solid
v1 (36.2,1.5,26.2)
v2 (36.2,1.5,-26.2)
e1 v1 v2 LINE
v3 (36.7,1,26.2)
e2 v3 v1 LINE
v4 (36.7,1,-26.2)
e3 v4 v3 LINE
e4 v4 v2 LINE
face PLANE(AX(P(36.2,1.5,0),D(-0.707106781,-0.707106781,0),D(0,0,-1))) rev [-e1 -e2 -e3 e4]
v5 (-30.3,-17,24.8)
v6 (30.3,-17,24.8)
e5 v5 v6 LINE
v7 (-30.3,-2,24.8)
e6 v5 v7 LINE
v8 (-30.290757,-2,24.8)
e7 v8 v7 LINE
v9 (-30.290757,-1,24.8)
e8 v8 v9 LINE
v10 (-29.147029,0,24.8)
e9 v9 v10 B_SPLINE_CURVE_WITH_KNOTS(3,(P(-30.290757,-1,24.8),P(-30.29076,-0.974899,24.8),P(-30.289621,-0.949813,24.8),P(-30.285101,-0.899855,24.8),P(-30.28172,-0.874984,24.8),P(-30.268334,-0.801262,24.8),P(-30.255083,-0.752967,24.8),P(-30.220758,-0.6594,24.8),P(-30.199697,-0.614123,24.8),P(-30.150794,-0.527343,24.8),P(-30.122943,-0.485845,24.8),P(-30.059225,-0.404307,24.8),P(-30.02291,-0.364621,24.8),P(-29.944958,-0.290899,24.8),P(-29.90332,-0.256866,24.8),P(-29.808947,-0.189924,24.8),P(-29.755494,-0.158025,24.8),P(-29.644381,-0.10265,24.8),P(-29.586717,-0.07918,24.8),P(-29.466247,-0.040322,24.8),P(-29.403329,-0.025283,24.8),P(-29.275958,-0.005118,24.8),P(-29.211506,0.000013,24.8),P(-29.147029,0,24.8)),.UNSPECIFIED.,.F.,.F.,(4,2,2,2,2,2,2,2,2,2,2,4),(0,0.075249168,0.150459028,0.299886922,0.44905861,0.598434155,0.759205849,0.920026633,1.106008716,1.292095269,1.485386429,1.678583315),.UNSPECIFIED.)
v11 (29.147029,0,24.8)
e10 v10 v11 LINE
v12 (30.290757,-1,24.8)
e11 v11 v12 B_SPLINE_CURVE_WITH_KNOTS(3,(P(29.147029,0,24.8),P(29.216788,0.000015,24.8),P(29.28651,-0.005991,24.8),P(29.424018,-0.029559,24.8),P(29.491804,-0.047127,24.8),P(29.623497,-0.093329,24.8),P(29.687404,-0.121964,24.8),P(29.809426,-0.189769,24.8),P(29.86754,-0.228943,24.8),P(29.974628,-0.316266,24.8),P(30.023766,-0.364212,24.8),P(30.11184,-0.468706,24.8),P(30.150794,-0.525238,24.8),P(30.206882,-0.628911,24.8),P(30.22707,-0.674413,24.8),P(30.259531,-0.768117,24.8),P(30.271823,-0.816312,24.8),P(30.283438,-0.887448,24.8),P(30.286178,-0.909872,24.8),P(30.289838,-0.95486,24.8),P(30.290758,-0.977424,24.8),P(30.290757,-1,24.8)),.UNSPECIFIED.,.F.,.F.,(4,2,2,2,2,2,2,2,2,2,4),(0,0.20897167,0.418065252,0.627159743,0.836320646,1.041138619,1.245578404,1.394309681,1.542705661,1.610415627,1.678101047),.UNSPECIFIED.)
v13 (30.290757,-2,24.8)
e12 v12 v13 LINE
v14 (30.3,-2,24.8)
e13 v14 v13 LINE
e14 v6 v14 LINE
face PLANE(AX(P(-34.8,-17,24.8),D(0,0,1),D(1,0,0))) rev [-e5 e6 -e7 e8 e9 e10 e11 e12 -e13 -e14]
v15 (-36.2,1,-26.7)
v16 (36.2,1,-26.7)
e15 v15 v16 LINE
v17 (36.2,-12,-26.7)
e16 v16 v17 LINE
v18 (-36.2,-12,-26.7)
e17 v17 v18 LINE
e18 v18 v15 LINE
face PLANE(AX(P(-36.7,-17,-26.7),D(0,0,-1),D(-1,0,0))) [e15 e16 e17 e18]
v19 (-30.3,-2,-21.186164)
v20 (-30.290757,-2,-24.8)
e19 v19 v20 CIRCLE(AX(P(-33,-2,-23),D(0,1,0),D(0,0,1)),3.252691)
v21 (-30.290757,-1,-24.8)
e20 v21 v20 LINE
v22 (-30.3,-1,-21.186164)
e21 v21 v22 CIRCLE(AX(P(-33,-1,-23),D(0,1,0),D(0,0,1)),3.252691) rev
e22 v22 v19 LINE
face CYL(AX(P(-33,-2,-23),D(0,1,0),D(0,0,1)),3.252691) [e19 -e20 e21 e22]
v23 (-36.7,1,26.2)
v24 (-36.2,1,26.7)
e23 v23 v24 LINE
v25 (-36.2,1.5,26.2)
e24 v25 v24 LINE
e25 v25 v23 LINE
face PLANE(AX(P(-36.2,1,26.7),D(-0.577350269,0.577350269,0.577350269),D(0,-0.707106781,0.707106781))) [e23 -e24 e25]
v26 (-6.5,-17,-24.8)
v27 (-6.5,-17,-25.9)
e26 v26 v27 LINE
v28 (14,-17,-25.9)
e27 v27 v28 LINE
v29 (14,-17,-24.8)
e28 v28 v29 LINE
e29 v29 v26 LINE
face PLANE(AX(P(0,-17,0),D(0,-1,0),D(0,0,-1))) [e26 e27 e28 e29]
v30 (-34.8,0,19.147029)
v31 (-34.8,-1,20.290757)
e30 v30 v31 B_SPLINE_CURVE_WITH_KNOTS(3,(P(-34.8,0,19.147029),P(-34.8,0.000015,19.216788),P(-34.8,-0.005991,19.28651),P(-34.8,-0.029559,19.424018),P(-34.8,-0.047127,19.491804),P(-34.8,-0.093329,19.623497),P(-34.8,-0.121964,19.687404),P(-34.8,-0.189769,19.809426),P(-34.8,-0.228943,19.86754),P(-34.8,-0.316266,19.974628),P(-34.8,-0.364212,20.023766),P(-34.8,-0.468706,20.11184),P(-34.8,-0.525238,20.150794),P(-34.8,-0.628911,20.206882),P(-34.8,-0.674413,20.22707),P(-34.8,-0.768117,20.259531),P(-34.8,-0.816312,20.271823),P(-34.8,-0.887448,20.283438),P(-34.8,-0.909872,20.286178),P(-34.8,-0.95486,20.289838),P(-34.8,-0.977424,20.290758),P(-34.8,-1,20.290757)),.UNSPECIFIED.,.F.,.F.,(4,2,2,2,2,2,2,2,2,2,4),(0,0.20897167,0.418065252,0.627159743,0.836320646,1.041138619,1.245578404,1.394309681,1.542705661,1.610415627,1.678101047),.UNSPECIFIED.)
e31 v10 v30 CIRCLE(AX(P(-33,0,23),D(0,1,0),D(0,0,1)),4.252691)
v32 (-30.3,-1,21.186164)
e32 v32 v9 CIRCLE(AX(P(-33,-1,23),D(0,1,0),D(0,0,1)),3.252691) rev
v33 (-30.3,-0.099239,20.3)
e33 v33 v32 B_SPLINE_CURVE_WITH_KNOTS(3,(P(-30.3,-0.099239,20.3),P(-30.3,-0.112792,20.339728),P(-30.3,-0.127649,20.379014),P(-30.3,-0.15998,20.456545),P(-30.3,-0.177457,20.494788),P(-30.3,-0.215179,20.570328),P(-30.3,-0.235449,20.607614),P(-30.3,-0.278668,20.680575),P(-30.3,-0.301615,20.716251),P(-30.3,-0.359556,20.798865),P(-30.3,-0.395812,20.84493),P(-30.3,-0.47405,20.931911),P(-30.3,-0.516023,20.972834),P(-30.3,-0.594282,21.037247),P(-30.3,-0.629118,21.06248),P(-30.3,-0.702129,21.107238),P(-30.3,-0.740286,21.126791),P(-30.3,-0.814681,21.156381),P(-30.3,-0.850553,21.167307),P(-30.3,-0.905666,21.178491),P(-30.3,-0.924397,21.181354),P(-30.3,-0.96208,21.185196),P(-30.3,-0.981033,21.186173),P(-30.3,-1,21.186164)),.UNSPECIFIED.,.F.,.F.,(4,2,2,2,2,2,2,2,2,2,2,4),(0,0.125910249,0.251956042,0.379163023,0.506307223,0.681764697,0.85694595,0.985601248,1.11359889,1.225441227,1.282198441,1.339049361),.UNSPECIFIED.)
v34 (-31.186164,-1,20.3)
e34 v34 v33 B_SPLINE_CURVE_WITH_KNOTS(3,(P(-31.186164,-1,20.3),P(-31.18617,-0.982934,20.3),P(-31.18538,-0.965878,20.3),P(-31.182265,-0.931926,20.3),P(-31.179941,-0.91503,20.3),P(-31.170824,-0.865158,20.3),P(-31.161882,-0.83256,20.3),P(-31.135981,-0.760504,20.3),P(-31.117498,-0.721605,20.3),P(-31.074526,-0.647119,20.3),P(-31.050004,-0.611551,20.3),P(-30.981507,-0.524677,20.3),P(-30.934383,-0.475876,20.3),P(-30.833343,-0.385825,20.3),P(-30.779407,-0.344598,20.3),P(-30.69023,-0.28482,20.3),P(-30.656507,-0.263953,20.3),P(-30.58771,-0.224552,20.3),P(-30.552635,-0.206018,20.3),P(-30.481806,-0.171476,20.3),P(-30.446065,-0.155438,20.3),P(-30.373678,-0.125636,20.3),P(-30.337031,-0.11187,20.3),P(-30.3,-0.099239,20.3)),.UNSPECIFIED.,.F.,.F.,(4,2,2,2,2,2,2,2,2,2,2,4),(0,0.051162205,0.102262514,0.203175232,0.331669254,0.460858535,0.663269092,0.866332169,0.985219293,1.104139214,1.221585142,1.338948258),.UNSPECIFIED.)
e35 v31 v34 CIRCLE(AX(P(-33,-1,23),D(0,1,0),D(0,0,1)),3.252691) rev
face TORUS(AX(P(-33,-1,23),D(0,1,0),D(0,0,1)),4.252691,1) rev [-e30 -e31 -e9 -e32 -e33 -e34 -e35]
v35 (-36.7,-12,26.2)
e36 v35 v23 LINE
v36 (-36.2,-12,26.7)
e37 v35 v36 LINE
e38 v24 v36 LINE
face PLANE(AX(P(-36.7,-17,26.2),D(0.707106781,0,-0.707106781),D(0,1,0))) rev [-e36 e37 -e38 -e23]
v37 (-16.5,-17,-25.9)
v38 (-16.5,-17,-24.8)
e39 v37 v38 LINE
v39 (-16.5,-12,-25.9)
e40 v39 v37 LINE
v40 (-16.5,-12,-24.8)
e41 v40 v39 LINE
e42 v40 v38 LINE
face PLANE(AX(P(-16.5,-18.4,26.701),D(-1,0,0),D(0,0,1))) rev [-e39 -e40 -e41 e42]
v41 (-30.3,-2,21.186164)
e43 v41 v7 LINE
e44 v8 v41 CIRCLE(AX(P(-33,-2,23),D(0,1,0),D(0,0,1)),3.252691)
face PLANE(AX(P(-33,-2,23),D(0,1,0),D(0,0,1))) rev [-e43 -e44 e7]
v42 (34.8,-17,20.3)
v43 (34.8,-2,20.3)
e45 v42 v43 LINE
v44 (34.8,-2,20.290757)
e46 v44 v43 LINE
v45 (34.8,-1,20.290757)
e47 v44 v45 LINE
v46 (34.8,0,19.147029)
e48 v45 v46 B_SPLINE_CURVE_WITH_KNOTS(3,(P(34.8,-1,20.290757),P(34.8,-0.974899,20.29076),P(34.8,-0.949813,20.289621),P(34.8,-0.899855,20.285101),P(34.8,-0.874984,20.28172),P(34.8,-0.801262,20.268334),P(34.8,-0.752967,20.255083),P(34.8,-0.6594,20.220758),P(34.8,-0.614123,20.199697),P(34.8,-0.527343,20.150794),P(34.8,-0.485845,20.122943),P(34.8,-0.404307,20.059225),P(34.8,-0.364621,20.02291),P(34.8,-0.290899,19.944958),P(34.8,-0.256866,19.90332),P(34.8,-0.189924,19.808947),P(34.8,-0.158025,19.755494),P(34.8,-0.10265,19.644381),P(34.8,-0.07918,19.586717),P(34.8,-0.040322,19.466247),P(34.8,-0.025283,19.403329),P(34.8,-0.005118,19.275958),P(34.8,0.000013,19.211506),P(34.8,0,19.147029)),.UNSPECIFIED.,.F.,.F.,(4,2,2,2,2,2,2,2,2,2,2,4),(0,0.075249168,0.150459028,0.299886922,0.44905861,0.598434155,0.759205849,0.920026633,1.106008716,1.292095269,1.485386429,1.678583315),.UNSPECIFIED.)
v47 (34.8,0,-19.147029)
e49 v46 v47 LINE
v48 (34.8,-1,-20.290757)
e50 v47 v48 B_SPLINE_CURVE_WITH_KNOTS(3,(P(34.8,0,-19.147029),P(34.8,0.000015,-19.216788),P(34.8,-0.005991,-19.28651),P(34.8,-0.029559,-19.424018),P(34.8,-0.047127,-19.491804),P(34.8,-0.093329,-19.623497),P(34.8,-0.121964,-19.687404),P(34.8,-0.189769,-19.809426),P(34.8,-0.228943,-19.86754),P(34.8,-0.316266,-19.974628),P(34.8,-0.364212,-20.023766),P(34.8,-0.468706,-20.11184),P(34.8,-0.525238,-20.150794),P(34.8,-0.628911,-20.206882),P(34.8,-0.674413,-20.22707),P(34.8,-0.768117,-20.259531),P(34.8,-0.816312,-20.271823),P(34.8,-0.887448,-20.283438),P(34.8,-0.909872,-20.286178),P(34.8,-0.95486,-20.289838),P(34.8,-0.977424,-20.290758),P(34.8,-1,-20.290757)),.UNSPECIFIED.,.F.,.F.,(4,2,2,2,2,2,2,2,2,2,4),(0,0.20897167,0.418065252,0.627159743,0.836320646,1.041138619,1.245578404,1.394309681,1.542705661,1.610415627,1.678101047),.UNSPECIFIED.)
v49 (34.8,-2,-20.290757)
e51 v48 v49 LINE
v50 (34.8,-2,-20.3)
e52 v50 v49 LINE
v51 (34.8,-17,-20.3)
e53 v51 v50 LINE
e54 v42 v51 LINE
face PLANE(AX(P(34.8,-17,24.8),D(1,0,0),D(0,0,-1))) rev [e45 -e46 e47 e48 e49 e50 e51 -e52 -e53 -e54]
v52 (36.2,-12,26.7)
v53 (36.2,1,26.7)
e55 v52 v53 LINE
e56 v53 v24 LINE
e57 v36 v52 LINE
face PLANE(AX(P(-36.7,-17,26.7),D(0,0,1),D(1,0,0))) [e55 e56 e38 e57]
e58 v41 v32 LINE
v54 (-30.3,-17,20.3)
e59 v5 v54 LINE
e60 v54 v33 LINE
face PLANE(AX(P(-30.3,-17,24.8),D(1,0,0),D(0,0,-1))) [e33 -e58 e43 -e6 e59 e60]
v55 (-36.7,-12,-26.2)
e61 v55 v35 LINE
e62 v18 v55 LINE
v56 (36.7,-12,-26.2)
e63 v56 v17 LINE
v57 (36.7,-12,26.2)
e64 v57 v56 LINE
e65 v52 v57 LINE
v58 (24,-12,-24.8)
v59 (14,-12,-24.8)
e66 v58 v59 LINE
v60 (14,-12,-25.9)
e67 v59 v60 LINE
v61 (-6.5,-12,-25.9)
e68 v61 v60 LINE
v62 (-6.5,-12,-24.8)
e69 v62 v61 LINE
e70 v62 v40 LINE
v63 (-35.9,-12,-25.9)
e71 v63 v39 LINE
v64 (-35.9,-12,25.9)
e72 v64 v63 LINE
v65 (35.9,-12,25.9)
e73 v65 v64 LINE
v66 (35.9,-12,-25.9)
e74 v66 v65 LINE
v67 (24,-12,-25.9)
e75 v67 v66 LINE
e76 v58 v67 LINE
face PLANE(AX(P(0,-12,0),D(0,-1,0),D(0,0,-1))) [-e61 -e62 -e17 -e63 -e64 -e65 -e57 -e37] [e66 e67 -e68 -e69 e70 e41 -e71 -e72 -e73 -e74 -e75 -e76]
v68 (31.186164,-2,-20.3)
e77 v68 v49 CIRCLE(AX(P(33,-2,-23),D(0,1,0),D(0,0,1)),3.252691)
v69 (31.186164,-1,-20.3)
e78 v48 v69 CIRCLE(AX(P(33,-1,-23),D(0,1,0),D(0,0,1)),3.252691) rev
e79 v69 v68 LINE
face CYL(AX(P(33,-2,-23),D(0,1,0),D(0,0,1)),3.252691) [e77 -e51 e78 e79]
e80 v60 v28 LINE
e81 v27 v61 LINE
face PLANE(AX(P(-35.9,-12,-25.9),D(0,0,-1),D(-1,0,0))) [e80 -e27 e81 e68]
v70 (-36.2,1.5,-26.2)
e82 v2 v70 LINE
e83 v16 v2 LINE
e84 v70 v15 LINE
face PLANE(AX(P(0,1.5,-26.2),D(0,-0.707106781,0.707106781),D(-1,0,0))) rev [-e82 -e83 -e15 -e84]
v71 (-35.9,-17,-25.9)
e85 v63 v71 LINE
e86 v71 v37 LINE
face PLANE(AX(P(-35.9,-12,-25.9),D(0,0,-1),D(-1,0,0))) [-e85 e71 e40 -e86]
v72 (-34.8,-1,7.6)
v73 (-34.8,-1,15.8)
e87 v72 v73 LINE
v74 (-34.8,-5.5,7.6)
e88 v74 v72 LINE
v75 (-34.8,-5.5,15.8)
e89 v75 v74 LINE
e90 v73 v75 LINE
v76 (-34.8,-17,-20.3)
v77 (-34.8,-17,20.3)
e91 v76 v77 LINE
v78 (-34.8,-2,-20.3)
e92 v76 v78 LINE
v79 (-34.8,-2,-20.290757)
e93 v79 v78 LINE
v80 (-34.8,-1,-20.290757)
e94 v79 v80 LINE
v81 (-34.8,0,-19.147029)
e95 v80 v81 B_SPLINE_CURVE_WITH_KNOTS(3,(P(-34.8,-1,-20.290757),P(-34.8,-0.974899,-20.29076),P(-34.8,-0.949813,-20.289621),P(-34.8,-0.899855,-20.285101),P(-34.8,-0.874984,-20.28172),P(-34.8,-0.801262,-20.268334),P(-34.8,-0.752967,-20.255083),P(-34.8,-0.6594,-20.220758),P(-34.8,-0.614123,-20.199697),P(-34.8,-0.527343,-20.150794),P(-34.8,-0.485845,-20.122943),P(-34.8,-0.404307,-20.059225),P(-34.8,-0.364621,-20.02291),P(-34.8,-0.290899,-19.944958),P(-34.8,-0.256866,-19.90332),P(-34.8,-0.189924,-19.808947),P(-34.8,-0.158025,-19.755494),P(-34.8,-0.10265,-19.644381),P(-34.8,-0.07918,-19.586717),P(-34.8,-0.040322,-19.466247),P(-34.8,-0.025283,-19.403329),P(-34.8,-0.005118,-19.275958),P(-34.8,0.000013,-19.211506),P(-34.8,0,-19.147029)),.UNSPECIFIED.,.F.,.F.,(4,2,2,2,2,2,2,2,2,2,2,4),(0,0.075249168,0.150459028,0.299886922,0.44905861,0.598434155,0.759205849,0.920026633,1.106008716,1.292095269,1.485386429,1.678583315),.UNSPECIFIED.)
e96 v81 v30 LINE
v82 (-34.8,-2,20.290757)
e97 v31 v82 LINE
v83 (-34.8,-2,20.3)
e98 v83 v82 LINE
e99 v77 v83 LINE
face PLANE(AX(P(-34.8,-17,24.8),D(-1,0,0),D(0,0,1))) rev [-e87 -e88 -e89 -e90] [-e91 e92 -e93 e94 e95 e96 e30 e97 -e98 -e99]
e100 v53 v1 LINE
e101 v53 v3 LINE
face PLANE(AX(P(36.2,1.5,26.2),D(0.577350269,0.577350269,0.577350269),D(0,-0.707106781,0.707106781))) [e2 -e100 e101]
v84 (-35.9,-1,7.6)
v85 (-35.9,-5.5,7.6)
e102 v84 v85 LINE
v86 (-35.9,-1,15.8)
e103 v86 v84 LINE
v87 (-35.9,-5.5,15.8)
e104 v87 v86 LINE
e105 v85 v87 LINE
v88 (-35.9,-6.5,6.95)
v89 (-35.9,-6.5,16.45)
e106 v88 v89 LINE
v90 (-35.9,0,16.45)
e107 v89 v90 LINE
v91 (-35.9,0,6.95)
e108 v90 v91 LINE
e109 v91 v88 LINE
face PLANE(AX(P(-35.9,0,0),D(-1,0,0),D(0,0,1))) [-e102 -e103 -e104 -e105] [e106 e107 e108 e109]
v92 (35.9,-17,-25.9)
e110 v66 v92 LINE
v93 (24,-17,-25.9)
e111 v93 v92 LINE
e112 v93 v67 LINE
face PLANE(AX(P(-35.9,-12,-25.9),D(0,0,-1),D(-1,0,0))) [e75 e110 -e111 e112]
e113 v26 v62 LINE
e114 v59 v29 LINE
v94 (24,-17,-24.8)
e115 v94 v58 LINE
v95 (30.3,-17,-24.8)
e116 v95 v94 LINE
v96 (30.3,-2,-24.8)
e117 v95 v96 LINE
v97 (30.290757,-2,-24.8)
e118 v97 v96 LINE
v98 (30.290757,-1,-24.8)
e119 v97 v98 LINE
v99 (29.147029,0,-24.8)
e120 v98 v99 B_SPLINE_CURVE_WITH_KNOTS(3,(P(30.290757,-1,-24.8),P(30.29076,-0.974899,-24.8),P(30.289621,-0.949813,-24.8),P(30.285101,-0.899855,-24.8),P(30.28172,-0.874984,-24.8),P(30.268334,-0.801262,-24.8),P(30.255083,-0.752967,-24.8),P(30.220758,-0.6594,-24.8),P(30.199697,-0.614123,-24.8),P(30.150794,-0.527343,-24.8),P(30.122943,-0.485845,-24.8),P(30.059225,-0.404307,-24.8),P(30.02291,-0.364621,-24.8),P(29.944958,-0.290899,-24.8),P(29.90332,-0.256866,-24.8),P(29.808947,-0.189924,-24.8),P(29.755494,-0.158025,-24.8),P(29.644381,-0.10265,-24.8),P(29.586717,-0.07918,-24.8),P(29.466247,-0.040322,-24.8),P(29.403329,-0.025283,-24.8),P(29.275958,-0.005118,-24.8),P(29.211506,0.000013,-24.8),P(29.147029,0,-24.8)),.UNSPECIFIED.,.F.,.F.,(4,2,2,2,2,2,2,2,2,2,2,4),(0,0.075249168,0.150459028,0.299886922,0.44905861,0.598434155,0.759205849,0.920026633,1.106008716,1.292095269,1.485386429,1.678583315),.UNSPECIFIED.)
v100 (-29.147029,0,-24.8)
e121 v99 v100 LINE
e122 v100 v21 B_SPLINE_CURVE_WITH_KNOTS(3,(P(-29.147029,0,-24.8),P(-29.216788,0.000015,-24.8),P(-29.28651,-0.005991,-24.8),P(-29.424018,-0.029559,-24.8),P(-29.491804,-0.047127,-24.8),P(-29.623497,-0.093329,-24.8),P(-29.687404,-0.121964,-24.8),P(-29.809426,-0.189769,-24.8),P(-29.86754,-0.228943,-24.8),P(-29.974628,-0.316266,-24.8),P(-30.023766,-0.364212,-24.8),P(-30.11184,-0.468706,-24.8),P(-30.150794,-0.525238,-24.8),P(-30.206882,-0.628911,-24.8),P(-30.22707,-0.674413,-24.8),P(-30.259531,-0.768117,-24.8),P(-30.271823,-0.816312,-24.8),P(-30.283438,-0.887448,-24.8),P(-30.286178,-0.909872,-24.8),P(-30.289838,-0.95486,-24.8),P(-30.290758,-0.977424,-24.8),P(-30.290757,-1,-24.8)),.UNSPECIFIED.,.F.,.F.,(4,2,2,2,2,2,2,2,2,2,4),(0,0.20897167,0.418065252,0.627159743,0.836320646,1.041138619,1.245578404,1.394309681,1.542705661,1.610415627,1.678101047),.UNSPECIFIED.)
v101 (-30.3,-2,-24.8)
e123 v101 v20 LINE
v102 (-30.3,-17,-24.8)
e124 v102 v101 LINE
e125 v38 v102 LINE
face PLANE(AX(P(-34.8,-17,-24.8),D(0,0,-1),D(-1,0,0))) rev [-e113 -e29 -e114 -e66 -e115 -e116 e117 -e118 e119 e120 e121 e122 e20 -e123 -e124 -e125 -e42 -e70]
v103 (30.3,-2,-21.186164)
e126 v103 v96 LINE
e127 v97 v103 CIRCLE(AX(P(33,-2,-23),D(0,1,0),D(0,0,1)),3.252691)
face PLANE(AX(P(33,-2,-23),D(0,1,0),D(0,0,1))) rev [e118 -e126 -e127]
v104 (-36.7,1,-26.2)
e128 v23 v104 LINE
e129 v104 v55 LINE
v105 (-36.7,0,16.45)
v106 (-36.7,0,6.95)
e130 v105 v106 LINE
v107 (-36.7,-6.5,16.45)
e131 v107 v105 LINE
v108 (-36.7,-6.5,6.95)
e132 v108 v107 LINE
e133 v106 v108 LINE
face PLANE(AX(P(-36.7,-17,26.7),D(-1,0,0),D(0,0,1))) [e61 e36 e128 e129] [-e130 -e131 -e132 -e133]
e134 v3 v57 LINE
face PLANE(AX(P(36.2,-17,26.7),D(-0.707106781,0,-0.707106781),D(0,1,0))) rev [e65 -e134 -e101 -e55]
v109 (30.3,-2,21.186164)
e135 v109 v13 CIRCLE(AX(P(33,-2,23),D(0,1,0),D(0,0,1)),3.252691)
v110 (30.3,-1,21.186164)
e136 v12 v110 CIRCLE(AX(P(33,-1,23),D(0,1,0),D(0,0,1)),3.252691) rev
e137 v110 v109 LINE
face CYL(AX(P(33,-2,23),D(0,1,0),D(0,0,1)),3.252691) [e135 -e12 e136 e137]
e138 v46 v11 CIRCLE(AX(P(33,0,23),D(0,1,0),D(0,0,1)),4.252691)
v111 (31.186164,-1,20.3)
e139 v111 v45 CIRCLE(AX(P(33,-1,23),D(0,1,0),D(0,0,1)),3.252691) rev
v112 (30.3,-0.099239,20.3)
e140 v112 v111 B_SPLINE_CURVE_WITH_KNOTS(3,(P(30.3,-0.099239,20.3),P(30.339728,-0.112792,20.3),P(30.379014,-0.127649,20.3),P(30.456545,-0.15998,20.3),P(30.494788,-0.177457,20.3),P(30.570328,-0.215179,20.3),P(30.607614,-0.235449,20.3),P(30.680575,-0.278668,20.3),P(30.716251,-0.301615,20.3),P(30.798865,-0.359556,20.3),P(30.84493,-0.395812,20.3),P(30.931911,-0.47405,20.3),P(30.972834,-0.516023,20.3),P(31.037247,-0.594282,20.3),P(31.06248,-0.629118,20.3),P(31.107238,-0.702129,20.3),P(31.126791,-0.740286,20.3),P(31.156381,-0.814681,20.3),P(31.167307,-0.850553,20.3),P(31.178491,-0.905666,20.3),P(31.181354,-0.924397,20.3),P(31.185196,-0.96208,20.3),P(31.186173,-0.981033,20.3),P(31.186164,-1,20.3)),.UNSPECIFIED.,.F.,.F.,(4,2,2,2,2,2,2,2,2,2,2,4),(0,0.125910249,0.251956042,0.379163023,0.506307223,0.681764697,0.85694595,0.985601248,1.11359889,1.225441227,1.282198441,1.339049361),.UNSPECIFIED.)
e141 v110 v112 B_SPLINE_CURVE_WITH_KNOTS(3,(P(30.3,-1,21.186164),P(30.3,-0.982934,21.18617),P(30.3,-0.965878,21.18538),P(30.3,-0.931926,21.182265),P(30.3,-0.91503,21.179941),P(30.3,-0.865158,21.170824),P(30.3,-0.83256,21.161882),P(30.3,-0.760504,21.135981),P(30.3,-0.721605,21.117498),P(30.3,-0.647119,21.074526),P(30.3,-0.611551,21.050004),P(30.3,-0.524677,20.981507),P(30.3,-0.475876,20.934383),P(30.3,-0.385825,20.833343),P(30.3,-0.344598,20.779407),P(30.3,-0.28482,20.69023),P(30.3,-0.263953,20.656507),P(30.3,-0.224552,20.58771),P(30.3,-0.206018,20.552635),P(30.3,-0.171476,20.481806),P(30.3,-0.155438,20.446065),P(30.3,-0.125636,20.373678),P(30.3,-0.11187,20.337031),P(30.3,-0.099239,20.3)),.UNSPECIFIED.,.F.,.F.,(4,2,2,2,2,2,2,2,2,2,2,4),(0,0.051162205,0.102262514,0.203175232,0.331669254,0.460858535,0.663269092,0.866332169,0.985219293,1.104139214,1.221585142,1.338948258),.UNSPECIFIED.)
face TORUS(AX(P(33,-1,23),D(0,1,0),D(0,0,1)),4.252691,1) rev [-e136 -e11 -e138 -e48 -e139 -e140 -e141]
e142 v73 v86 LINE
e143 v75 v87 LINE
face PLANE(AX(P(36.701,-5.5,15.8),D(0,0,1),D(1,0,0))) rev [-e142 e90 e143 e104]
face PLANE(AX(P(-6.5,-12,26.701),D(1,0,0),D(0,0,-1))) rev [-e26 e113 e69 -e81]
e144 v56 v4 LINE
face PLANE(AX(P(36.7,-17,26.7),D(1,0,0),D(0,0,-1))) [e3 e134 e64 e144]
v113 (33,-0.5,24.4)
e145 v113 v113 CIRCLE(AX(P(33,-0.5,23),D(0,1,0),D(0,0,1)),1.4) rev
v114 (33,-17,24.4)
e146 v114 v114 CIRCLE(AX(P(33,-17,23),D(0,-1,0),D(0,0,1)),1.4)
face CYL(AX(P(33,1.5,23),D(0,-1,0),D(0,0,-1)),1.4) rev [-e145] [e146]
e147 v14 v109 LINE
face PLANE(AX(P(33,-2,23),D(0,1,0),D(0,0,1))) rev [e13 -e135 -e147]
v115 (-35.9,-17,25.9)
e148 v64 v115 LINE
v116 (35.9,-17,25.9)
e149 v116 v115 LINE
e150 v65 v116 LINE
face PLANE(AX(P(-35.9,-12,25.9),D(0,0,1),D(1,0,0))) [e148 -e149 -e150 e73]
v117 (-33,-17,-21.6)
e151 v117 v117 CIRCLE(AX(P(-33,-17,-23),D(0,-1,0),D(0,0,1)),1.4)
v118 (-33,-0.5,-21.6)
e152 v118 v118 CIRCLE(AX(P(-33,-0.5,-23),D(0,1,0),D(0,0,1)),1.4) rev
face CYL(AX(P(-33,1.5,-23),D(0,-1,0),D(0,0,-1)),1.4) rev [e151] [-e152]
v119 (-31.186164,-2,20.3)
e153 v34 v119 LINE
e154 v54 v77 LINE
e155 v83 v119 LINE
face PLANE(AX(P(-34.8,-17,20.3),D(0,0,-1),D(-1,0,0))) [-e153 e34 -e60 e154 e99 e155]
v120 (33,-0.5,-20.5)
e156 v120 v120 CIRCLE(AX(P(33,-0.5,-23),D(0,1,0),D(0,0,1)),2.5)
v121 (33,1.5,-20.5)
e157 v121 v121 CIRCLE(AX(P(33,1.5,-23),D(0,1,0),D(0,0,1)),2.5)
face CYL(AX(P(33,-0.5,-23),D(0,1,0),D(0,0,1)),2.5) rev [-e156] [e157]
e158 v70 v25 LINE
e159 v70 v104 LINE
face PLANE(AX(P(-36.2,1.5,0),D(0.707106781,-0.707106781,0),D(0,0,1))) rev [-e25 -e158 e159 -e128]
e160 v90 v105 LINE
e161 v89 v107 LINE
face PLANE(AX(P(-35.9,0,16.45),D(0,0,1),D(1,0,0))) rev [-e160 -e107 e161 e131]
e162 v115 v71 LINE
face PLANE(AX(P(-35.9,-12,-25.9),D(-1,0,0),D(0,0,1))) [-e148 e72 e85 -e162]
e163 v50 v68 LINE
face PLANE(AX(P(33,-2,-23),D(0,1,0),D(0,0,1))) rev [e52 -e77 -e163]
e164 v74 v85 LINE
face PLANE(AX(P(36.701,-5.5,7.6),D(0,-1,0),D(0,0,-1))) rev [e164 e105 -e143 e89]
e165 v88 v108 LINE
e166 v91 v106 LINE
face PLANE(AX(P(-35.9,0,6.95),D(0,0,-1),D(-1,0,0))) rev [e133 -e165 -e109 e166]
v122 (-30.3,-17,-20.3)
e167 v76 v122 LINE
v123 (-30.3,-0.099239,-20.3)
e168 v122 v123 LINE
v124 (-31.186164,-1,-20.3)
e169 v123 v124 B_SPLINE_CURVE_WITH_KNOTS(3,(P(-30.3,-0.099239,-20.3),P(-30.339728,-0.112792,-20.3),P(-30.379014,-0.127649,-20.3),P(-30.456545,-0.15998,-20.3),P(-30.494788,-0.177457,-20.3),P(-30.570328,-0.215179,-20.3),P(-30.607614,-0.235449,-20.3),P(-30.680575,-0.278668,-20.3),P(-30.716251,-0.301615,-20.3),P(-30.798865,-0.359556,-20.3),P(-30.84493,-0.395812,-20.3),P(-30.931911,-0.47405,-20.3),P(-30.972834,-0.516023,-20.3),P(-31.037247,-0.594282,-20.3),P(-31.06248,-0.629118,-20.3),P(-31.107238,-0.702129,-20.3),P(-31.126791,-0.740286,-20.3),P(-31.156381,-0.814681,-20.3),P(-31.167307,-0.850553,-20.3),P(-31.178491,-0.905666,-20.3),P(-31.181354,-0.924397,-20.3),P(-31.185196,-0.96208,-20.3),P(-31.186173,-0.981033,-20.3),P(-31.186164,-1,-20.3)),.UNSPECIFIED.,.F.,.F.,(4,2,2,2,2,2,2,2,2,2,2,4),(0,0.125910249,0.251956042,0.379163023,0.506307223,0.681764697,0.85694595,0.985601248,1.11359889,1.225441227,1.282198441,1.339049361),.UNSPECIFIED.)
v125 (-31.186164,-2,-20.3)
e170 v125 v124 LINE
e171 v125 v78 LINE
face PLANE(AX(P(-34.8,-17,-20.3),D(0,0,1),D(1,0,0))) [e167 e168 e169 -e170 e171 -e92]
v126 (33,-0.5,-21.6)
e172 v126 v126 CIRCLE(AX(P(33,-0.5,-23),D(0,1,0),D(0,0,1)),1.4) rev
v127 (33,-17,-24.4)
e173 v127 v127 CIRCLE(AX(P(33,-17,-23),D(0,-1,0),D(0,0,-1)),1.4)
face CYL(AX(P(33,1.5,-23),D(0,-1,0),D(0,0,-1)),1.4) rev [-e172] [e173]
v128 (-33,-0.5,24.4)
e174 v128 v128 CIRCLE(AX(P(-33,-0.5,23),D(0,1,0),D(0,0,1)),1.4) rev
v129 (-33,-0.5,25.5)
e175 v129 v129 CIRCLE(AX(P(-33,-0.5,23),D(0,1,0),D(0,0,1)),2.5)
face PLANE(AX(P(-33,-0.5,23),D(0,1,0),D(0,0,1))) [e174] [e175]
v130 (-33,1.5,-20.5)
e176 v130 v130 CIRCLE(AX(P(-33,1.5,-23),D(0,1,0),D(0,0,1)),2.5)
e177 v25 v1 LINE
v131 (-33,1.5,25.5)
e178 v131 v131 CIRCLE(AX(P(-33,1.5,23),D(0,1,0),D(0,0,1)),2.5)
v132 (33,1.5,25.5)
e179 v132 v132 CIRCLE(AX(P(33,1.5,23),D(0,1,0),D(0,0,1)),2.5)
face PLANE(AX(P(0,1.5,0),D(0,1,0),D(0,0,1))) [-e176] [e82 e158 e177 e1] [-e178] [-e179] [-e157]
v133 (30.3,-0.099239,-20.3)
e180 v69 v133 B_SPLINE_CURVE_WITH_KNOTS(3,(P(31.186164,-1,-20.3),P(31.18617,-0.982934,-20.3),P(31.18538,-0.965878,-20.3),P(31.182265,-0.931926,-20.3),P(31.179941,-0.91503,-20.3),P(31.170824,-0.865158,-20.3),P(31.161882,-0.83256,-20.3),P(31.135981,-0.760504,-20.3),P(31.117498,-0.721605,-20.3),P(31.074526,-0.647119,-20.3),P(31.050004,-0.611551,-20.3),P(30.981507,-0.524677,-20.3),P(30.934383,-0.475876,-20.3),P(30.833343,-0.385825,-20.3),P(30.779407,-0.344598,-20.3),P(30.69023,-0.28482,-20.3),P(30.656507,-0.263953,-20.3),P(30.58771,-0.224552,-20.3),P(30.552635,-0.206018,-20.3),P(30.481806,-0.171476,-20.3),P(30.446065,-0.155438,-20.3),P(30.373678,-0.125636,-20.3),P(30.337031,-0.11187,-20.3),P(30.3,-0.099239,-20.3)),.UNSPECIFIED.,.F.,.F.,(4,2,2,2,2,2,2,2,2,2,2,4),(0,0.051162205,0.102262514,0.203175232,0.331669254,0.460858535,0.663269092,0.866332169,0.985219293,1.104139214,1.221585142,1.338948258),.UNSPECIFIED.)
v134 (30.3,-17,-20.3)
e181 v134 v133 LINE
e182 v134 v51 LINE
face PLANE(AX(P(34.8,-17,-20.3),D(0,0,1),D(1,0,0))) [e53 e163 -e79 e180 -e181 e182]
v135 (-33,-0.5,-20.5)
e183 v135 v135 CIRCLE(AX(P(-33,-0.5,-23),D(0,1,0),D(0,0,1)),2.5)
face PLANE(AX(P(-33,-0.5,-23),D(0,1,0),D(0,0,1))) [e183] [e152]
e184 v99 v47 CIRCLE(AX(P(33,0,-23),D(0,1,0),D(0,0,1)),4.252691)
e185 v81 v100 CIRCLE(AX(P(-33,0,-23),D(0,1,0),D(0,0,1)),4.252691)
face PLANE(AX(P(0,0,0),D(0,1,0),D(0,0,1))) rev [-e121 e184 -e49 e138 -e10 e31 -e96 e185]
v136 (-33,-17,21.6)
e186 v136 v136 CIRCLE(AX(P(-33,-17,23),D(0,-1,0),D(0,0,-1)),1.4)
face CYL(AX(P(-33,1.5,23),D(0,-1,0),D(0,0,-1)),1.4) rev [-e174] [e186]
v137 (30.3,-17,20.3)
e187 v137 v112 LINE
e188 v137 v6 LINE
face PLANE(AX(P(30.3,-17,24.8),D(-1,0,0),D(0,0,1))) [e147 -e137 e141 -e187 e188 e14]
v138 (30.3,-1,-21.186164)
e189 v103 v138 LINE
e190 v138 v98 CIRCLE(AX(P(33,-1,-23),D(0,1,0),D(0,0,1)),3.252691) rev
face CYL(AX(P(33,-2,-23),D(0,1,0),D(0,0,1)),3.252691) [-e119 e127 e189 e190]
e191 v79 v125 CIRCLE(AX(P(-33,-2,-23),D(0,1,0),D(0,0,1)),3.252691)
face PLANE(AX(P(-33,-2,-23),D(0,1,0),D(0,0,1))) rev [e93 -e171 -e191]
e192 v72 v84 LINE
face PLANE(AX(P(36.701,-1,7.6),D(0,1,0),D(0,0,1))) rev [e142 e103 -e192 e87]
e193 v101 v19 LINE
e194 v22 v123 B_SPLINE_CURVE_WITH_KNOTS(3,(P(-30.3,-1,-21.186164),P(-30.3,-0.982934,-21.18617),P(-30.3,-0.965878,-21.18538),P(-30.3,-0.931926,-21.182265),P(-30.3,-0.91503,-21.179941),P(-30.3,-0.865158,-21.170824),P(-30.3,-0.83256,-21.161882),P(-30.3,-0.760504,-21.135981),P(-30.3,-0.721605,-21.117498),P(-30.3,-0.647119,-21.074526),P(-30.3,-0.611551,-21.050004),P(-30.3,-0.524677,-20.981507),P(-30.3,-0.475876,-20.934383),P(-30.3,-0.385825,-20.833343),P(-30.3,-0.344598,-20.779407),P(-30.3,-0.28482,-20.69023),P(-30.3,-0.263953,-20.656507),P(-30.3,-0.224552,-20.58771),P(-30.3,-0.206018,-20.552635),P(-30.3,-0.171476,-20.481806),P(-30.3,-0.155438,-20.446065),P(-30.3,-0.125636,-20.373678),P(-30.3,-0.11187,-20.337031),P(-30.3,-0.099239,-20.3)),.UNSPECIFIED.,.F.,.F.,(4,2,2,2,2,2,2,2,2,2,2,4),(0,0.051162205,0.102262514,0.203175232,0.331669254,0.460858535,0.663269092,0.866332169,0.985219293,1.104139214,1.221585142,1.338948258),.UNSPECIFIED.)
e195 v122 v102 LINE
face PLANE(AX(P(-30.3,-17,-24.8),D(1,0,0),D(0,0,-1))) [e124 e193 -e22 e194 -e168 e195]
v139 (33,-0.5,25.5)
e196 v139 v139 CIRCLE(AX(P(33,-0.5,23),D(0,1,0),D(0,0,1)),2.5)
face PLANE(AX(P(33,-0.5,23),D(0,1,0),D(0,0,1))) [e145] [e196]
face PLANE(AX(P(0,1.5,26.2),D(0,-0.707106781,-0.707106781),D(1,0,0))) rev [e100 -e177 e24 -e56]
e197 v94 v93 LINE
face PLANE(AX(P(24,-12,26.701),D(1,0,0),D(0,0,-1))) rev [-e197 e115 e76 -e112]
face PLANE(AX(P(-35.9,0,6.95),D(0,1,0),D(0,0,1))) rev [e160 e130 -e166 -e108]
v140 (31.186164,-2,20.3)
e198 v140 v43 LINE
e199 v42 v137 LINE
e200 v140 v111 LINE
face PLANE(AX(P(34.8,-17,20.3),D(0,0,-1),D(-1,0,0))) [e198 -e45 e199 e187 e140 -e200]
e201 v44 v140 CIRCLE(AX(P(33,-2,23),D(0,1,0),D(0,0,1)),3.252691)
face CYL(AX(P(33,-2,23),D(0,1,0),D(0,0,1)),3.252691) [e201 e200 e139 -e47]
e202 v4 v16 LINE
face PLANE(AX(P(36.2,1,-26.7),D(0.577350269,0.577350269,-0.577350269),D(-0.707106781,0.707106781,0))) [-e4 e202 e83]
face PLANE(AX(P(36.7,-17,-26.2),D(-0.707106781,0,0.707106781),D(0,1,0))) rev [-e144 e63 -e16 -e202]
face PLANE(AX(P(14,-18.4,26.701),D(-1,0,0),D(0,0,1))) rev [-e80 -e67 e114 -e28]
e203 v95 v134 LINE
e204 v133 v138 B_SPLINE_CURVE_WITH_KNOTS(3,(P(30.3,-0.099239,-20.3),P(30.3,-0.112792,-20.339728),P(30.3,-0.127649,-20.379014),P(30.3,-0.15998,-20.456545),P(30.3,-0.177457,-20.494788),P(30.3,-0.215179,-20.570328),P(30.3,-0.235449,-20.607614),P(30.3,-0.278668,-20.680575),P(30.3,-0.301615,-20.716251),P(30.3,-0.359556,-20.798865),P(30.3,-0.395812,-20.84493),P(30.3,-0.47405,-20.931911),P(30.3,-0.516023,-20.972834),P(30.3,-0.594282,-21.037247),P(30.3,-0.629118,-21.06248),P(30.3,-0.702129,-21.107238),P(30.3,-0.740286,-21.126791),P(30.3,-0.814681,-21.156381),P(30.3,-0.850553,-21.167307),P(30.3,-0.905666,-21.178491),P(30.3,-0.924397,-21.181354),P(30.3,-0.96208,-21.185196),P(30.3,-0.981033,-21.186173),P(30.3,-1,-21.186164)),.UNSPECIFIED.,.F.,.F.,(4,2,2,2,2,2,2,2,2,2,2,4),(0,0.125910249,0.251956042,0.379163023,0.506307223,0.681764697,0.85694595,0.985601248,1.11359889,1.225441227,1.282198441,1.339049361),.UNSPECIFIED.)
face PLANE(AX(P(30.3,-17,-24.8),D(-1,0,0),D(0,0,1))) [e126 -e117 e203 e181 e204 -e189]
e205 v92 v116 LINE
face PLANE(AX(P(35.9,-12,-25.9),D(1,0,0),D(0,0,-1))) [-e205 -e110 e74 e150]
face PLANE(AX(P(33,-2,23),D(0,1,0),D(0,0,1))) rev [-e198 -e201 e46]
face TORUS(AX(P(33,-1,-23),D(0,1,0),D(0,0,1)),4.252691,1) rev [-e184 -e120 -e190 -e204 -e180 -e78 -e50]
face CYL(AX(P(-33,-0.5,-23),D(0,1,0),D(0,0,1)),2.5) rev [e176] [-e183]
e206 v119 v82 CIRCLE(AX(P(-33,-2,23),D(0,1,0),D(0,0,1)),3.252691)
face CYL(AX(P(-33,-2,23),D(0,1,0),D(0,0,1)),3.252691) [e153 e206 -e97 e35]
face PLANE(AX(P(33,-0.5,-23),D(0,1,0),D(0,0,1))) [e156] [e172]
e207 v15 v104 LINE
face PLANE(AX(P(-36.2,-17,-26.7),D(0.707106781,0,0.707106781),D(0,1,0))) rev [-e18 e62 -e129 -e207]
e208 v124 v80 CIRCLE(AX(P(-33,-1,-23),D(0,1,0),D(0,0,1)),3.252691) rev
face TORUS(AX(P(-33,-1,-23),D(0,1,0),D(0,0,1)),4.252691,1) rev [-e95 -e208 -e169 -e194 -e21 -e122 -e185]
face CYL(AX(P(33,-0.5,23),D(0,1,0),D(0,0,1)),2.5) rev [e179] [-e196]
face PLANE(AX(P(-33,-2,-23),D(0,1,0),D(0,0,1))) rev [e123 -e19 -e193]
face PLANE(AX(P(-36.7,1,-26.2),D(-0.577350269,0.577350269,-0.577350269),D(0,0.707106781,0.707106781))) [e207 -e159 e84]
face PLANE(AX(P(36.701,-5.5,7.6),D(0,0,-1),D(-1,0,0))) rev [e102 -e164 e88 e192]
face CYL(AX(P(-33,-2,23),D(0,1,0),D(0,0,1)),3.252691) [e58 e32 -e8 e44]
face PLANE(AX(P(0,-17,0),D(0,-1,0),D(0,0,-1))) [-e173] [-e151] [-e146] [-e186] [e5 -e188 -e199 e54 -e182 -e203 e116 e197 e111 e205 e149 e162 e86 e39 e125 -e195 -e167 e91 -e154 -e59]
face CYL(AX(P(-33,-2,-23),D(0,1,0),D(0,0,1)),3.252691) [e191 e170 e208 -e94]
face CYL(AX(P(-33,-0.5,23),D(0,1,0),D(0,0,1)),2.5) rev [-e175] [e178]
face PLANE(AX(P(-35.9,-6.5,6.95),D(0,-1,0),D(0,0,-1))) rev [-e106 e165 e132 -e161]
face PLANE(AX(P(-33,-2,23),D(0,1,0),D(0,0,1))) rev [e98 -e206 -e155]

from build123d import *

# Parameters (mm, degrees)
SKETCH_1_W           = 73.4
SKETCH_1_H           = 53.4
SKETCH_1_W_2         = 69.6
SKETCH_1_H_2         = 49.6
EXTRUDE_1_DEPTH      = 17
SKETCH_2_W           = 73.4
SKETCH_2_H           = 53.4
EXTRUDE_2_DEPTH      = 1.5
SKETCH_3_W           = 4.5
SKETCH_3_H           = 4.5
EXTRUDE_3_DEPTH      = 17
SKETCH_9_R           = 3.252691193
EXTRUDE_5_DEPTH      = 2
CHAMFER_1_SIZE       = 0.5
SKETCH_6_OUTSIDE_W   = 93.928
SKETCH_6_OUTSIDE_H   = 73.928
SKETCH_6_OUTSIDE_W_2 = 71.8
SKETCH_6_OUTSIDE_H_2 = 51.8
CUT_EXTRUDE_3_DEPTH  = 5
SKETCH_5_R           = 1.4
CUT_EXTRUDE_2_DEPTH  = 50.010509077
CUT_EXTRUDE_4_REACH  = 68.988
SKETCH_7_W           = 10
SKETCH_7_H           = 6.4
SKETCH_8_R           = 2.5
CUT_EXTRUDE_5_DEPTH  = 2
SKETCH_10_W          = 9.5
SKETCH_10_H          = 6.5
CUT_EXTRUDE_6_DEPTH  = 0.8
CUT_EXTRUDE_7_REACH  = 81.2
SKETCH_11_W          = 8.2
SKETCH_11_H          = 4.5
FILLET_1_R           = 1


with BuildPart() as part:
    # Эскиз1 → Бобышка-Вытянуть1 (new body)
    with BuildSketch(Plane(origin=(0, 0, 0), x_dir=(1, 0, 0), z_dir=(0, 1, 0))):
        Rectangle(SKETCH_1_W, SKETCH_1_H)
        Rectangle(SKETCH_1_W_2, SKETCH_1_H_2, mode=Mode.SUBTRACT)
    extrude(amount=-EXTRUDE_1_DEPTH)

    # Эскиз2 → Бобышка-Вытянуть2 (add)
    with BuildSketch(Plane(origin=(0, 0, 0), x_dir=(1, 0, 0), z_dir=(0, 1, 0))):
        Rectangle(SKETCH_2_W, SKETCH_2_H)
    extrude(amount=EXTRUDE_2_DEPTH)

    # Эскиз3 → Бобышка-Вытянуть3 (add, through all)
    with BuildSketch(Plane(origin=(0, 0, 0), x_dir=(1, 0, 0), z_dir=(0, 1, 0))):
        with Locations((-32.55, 22.55)):
            Rectangle(SKETCH_3_W, SKETCH_3_H)
        with Locations((32.55, 22.55)):
            Rectangle(SKETCH_3_W, SKETCH_3_H)
        with Locations((-32.55, -22.55)):
            Rectangle(SKETCH_3_W, SKETCH_3_H)
        with Locations((32.55, -22.55)):
            Rectangle(SKETCH_3_W, SKETCH_3_H)
    extrude(amount=-EXTRUDE_3_DEPTH)

    # Эскиз9 → Бобышка-Вытянуть5 (add)
    with BuildSketch(Plane(origin=(0, 0, 0), x_dir=(-1, 0, 0), z_dir=(0, 1, 0))):
        with Locations((-33, 23)):
            Circle(SKETCH_9_R)
        with Locations((-33, -23)):
            Circle(SKETCH_9_R)
        with Locations((33, -23)):
            Circle(SKETCH_9_R)
        with Locations((33, 23)):
            Circle(SKETCH_9_R)
    extrude(amount=-EXTRUDE_5_DEPTH)

    # Фаска1
    chamfer_1_edges = [part.edges().sort_by_distance(p)[0] for p in [
        (-36.7, 1.5, 0),
        (0, 1.5, 26.7),
        (36.7, 1.5, 0),
        (0, 1.5, -26.7),
        (-36.7, -7.75, -26.7),
        (36.7, -7.75, -26.7),
        (36.7, -7.75, 26.7),
        (-36.7, -7.75, 26.7),
    ]]
    chamfer(chamfer_1_edges, length=CHAMFER_1_SIZE)

    # Эскиз6 outside → Вырез-Вытянуть3 (cut)
    with BuildSketch(Plane.XZ.offset(17)):
        Rectangle(SKETCH_6_OUTSIDE_W, SKETCH_6_OUTSIDE_H)
        Rectangle(SKETCH_6_OUTSIDE_W_2, SKETCH_6_OUTSIDE_H_2, mode=Mode.SUBTRACT)
    extrude(amount=-CUT_EXTRUDE_3_DEPTH, mode=Mode.SUBTRACT)

    # Эскиз5 → Вырез-Вытянуть2 (cut, through all)
    with BuildSketch(Plane.XZ.offset(17)):
        with Locations(Location((-33, 23, 0), (0, 0, 270))):
            Circle(SKETCH_5_R)
        with Locations(Location((33, 23, 0), (0, 0, 90))):
            Circle(SKETCH_5_R)
        with Locations(Location((33, -23, 0), (0, 0, 270))):
            Circle(SKETCH_5_R)
        with Locations(Location((-33, -23, 0), (0, 0, 90))):
            Circle(SKETCH_5_R)
    extrude(amount=-CUT_EXTRUDE_2_DEPTH, mode=Mode.SUBTRACT)

    # Эскиз7 → Вырез-Вытянуть4 (cut, up to next)
    with BuildSketch(Plane(origin=(0, 0, -26.7), x_dir=(-1, 0, 0), z_dir=(0, 0, -1)), mode=Mode.PRIVATE) as cut_extrude_4_sk1:
        with Locations((-19, -15.2)):
            Rectangle(SKETCH_7_W, SKETCH_7_H)
    cut_extrude_4_tool1 = extrude(cut_extrude_4_sk1.sketch, amount=-CUT_EXTRUDE_4_REACH, mode=Mode.PRIVATE) & part.part
    # Эскиз7 → Вырез-Вытянуть4 (cut, up to next)
    with BuildSketch(Plane(origin=(0, 0, -26.7), x_dir=(-1, 0, 0), z_dir=(0, 0, -1)), mode=Mode.PRIVATE) as cut_extrude_4_sk2:
        with Locations((11.5, -15.2)):
            Rectangle(SKETCH_7_W, SKETCH_7_H)
    cut_extrude_4_tool2 = extrude(cut_extrude_4_sk2.sketch, amount=-CUT_EXTRUDE_4_REACH, mode=Mode.PRIVATE) & part.part
    add(cut_extrude_4_tool1.solids().sort_by_distance((19, -15.2, -26.7))[0], mode=Mode.SUBTRACT)
    add(cut_extrude_4_tool2.solids().sort_by_distance((-11.5, -15.2, -26.7))[0], mode=Mode.SUBTRACT)

    # Эскиз8 → Вырез-Вытянуть5 (cut)
    with BuildSketch(Plane(origin=(0, 1.5, 0), x_dir=(1, 0, 0), z_dir=(0, 1, 0))):
        with Locations(Location((-33, 23, 0), (0, 0, 270))):
            Circle(SKETCH_8_R)
        with Locations(Location((33, 23, 0), (0, 0, 270))):
            Circle(SKETCH_8_R)
        with Locations(Location((33, -23, 0), (0, 0, 270))):
            Circle(SKETCH_8_R)
        with Locations(Location((-33, -23, 0), (0, 0, 270))):
            Circle(SKETCH_8_R)
    extrude(amount=-CUT_EXTRUDE_5_DEPTH, mode=Mode.SUBTRACT)

    # Эскиз10 → Вырез-Вытянуть6 (cut)
    with BuildSketch(Plane.ZY.offset(36.7)):
        with Locations((11.7, -3.25)):
            Rectangle(SKETCH_10_W, SKETCH_10_H)
    extrude(amount=-CUT_EXTRUDE_6_DEPTH, mode=Mode.SUBTRACT)

    # Эскиз11 → Вырез-Вытянуть7 (cut, up to next)
    with BuildSketch(Plane.ZY.offset(35.9), mode=Mode.PRIVATE) as cut_extrude_7_sk1:
        with Locations((11.7, -3.25)):
            Rectangle(SKETCH_11_W, SKETCH_11_H)
    cut_extrude_7_tool1 = extrude(cut_extrude_7_sk1.sketch, amount=-CUT_EXTRUDE_7_REACH, mode=Mode.PRIVATE) & part.part
    add(cut_extrude_7_tool1.solids().sort_by_distance((-35.9, -3.25, 11.7))[0], mode=Mode.SUBTRACT)

    # Скругление1
    # the kernel refuses this fillet: 1 mm, written as the material it adds along each edge
    with BuildSketch(Plane(origin=(-33, 0, -23), x_dir=(-0.9768477562841145, 0, 0.21393564696583717), z_dir=(-0.21393564696583717, 0, -0.9768477562841145))) as fillet_1_piece_1_section:
        with BuildLine():
            CenterArc((3.252691193 + FILLET_1_R, -FILLET_1_R), FILLET_1_R, 90, 90)
            Line((3.252691193, -FILLET_1_R), (3.252691193, 0))
            Line((3.252691193, 0), (3.252691193 + FILLET_1_R, 0))
        make_face()
    fillet_1_piece_1 = revolve(axis=Axis((-33, 0, -23), (0, 1, 0)), revolution_arc=155.58691753, mode=Mode.PRIVATE)
    fillet_1_piece_1 = split(fillet_1_piece_1, bisect_by=Plane(origin=(-34.8, -0.215043292, -19.734246257), z_dir=(1, 0, 0)), keep=Keep.TOP, mode=Mode.PRIVATE)
    add(fillet_1_piece_1)
    with BuildSketch(Plane(origin=(-33, 0, -23), x_dir=(0.20893573542178995, 0, 0.9779293729425228), z_dir=(-0.9779293729425228, 0, 0.20893573542178995))) as fillet_1_piece_2_section:
        with BuildLine():
            CenterArc((3.252691193 + FILLET_1_R, -FILLET_1_R), FILLET_1_R, 90, 90)
            Line((3.252691193, -FILLET_1_R), (3.252691193, 0))
            Line((3.252691193, 0), (3.252691193 + FILLET_1_R, 0))
        make_face()
    fillet_1_piece_2 = revolve(axis=Axis((-33, 0, -23), (0, 1, 0)), revolution_arc=155.58691753, mode=Mode.PRIVATE)
    fillet_1_piece_2 = split(fillet_1_piece_2, bisect_by=Plane(origin=(-31.496865792, -0.203453463, -24.8), z_dir=(0, 0, 1)), keep=Keep.TOP, mode=Mode.PRIVATE)
    add(fillet_1_piece_2)
    with BuildSketch(Plane(origin=(-33, 0, 23), x_dir=(0.21393564696585013, 0, 0.9768477562841116), z_dir=(-0.9768477562841116, 0, 0.21393564696585013))) as fillet_1_piece_3_section:
        with BuildLine():
            CenterArc((3.252691193 + FILLET_1_R, -FILLET_1_R), FILLET_1_R, 90, 90)
            Line((3.252691193, -FILLET_1_R), (3.252691193, 0))
            Line((3.252691193, 0), (3.252691193 + FILLET_1_R, 0))
        make_face()
    fillet_1_piece_3 = revolve(axis=Axis((-33, 0, 23), (0, 1, 0)), revolution_arc=155.58691753, mode=Mode.PRIVATE)
    fillet_1_piece_3 = split(fillet_1_piece_3, bisect_by=Plane(origin=(-29.734246201, -0.215043247, 24.8), z_dir=(0, 0, -1)), keep=Keep.TOP, mode=Mode.PRIVATE)
    add(fillet_1_piece_3)
    with BuildSketch(Plane(origin=(-33, 0, 23), x_dir=(0.9779293729425067, 0, -0.20893573542186514), z_dir=(0.20893573542186514, 0, 0.9779293729425067))) as fillet_1_piece_4_section:
        with BuildLine():
            CenterArc((3.252691193 + FILLET_1_R, -FILLET_1_R), FILLET_1_R, 90, 90)
            Line((3.252691193, -FILLET_1_R), (3.252691193, 0))
            Line((3.252691193, 0), (3.252691193 + FILLET_1_R, 0))
        make_face()
    fillet_1_piece_4 = revolve(axis=Axis((-33, 0, 23), (0, 1, 0)), revolution_arc=155.58691753, mode=Mode.PRIVATE)
    fillet_1_piece_4 = split(fillet_1_piece_4, bisect_by=Plane(origin=(-34.8, -0.203453257, 21.496866097), z_dir=(1, 0, 0)), keep=Keep.TOP, mode=Mode.PRIVATE)
    add(fillet_1_piece_4)
    with BuildSketch(Plane(origin=(33, 0, 23), x_dir=(0.9768477562841055, 0, -0.21393564696587863), z_dir=(0.21393564696587863, 0, 0.9768477562841055))) as fillet_1_piece_5_section:
        with BuildLine():
            CenterArc((3.252691193 + FILLET_1_R, -FILLET_1_R), FILLET_1_R, 90, 90)
            Line((3.252691193, -FILLET_1_R), (3.252691193, 0))
            Line((3.252691193, 0), (3.252691193 + FILLET_1_R, 0))
        make_face()
    fillet_1_piece_5 = revolve(axis=Axis((33, 0, 23), (0, 1, 0)), revolution_arc=155.58691753, mode=Mode.PRIVATE)
    fillet_1_piece_5 = split(fillet_1_piece_5, bisect_by=Plane(origin=(34.8, -0.215043292, 19.734246257), z_dir=(-1, 0, 0)), keep=Keep.TOP, mode=Mode.PRIVATE)
    add(fillet_1_piece_5)
    with BuildSketch(Plane(origin=(33, 0, 23), x_dir=(-0.20893573542180963, 0, -0.9779293729425186), z_dir=(0.9779293729425186, 0, -0.20893573542180963))) as fillet_1_piece_6_section:
        with BuildLine():
            CenterArc((3.252691193 + FILLET_1_R, -FILLET_1_R), FILLET_1_R, 90, 90)
            Line((3.252691193, -FILLET_1_R), (3.252691193, 0))
            Line((3.252691193, 0), (3.252691193 + FILLET_1_R, 0))
        make_face()
    fillet_1_piece_6 = revolve(axis=Axis((33, 0, 23), (0, 1, 0)), revolution_arc=155.58691753, mode=Mode.PRIVATE)
    fillet_1_piece_6 = split(fillet_1_piece_6, bisect_by=Plane(origin=(31.496865792, -0.203453463, 24.8), z_dir=(0, 0, -1)), keep=Keep.TOP, mode=Mode.PRIVATE)
    add(fillet_1_piece_6)
    with BuildSketch(Plane(origin=(33, 0, -23), x_dir=(-0.2139356469658719, 0, -0.9768477562841068), z_dir=(0.9768477562841068, 0, -0.2139356469658719))) as fillet_1_piece_7_section:
        with BuildLine():
            CenterArc((3.252691193 + FILLET_1_R, -FILLET_1_R), FILLET_1_R, 90, 90)
            Line((3.252691193, -FILLET_1_R), (3.252691193, 0))
            Line((3.252691193, 0), (3.252691193 + FILLET_1_R, 0))
        make_face()
    fillet_1_piece_7 = revolve(axis=Axis((33, 0, -23), (0, 1, 0)), revolution_arc=155.58691753, mode=Mode.PRIVATE)
    fillet_1_piece_7 = split(fillet_1_piece_7, bisect_by=Plane(origin=(29.734246201, -0.215043247, -24.8), z_dir=(0, 0, 1)), keep=Keep.TOP, mode=Mode.PRIVATE)
    add(fillet_1_piece_7)
    with BuildSketch(Plane(origin=(33, 0, -23), x_dir=(-0.9779293729425086, 0, 0.20893573542185656), z_dir=(-0.20893573542185656, 0, -0.9779293729425086))) as fillet_1_piece_8_section:
        with BuildLine():
            CenterArc((3.252691193 + FILLET_1_R, -FILLET_1_R), FILLET_1_R, 90, 90)
            Line((3.252691193, -FILLET_1_R), (3.252691193, 0))
            Line((3.252691193, 0), (3.252691193 + FILLET_1_R, 0))
        make_face()
    fillet_1_piece_8 = revolve(axis=Axis((33, 0, -23), (0, 1, 0)), revolution_arc=155.58691753, mode=Mode.PRIVATE)
    fillet_1_piece_8 = split(fillet_1_piece_8, bisect_by=Plane(origin=(34.8, -0.203453257, -21.496866097), z_dir=(-1, 0, 0)), keep=Keep.TOP, mode=Mode.PRIVATE)
    add(fillet_1_piece_8)


solid = part.part
